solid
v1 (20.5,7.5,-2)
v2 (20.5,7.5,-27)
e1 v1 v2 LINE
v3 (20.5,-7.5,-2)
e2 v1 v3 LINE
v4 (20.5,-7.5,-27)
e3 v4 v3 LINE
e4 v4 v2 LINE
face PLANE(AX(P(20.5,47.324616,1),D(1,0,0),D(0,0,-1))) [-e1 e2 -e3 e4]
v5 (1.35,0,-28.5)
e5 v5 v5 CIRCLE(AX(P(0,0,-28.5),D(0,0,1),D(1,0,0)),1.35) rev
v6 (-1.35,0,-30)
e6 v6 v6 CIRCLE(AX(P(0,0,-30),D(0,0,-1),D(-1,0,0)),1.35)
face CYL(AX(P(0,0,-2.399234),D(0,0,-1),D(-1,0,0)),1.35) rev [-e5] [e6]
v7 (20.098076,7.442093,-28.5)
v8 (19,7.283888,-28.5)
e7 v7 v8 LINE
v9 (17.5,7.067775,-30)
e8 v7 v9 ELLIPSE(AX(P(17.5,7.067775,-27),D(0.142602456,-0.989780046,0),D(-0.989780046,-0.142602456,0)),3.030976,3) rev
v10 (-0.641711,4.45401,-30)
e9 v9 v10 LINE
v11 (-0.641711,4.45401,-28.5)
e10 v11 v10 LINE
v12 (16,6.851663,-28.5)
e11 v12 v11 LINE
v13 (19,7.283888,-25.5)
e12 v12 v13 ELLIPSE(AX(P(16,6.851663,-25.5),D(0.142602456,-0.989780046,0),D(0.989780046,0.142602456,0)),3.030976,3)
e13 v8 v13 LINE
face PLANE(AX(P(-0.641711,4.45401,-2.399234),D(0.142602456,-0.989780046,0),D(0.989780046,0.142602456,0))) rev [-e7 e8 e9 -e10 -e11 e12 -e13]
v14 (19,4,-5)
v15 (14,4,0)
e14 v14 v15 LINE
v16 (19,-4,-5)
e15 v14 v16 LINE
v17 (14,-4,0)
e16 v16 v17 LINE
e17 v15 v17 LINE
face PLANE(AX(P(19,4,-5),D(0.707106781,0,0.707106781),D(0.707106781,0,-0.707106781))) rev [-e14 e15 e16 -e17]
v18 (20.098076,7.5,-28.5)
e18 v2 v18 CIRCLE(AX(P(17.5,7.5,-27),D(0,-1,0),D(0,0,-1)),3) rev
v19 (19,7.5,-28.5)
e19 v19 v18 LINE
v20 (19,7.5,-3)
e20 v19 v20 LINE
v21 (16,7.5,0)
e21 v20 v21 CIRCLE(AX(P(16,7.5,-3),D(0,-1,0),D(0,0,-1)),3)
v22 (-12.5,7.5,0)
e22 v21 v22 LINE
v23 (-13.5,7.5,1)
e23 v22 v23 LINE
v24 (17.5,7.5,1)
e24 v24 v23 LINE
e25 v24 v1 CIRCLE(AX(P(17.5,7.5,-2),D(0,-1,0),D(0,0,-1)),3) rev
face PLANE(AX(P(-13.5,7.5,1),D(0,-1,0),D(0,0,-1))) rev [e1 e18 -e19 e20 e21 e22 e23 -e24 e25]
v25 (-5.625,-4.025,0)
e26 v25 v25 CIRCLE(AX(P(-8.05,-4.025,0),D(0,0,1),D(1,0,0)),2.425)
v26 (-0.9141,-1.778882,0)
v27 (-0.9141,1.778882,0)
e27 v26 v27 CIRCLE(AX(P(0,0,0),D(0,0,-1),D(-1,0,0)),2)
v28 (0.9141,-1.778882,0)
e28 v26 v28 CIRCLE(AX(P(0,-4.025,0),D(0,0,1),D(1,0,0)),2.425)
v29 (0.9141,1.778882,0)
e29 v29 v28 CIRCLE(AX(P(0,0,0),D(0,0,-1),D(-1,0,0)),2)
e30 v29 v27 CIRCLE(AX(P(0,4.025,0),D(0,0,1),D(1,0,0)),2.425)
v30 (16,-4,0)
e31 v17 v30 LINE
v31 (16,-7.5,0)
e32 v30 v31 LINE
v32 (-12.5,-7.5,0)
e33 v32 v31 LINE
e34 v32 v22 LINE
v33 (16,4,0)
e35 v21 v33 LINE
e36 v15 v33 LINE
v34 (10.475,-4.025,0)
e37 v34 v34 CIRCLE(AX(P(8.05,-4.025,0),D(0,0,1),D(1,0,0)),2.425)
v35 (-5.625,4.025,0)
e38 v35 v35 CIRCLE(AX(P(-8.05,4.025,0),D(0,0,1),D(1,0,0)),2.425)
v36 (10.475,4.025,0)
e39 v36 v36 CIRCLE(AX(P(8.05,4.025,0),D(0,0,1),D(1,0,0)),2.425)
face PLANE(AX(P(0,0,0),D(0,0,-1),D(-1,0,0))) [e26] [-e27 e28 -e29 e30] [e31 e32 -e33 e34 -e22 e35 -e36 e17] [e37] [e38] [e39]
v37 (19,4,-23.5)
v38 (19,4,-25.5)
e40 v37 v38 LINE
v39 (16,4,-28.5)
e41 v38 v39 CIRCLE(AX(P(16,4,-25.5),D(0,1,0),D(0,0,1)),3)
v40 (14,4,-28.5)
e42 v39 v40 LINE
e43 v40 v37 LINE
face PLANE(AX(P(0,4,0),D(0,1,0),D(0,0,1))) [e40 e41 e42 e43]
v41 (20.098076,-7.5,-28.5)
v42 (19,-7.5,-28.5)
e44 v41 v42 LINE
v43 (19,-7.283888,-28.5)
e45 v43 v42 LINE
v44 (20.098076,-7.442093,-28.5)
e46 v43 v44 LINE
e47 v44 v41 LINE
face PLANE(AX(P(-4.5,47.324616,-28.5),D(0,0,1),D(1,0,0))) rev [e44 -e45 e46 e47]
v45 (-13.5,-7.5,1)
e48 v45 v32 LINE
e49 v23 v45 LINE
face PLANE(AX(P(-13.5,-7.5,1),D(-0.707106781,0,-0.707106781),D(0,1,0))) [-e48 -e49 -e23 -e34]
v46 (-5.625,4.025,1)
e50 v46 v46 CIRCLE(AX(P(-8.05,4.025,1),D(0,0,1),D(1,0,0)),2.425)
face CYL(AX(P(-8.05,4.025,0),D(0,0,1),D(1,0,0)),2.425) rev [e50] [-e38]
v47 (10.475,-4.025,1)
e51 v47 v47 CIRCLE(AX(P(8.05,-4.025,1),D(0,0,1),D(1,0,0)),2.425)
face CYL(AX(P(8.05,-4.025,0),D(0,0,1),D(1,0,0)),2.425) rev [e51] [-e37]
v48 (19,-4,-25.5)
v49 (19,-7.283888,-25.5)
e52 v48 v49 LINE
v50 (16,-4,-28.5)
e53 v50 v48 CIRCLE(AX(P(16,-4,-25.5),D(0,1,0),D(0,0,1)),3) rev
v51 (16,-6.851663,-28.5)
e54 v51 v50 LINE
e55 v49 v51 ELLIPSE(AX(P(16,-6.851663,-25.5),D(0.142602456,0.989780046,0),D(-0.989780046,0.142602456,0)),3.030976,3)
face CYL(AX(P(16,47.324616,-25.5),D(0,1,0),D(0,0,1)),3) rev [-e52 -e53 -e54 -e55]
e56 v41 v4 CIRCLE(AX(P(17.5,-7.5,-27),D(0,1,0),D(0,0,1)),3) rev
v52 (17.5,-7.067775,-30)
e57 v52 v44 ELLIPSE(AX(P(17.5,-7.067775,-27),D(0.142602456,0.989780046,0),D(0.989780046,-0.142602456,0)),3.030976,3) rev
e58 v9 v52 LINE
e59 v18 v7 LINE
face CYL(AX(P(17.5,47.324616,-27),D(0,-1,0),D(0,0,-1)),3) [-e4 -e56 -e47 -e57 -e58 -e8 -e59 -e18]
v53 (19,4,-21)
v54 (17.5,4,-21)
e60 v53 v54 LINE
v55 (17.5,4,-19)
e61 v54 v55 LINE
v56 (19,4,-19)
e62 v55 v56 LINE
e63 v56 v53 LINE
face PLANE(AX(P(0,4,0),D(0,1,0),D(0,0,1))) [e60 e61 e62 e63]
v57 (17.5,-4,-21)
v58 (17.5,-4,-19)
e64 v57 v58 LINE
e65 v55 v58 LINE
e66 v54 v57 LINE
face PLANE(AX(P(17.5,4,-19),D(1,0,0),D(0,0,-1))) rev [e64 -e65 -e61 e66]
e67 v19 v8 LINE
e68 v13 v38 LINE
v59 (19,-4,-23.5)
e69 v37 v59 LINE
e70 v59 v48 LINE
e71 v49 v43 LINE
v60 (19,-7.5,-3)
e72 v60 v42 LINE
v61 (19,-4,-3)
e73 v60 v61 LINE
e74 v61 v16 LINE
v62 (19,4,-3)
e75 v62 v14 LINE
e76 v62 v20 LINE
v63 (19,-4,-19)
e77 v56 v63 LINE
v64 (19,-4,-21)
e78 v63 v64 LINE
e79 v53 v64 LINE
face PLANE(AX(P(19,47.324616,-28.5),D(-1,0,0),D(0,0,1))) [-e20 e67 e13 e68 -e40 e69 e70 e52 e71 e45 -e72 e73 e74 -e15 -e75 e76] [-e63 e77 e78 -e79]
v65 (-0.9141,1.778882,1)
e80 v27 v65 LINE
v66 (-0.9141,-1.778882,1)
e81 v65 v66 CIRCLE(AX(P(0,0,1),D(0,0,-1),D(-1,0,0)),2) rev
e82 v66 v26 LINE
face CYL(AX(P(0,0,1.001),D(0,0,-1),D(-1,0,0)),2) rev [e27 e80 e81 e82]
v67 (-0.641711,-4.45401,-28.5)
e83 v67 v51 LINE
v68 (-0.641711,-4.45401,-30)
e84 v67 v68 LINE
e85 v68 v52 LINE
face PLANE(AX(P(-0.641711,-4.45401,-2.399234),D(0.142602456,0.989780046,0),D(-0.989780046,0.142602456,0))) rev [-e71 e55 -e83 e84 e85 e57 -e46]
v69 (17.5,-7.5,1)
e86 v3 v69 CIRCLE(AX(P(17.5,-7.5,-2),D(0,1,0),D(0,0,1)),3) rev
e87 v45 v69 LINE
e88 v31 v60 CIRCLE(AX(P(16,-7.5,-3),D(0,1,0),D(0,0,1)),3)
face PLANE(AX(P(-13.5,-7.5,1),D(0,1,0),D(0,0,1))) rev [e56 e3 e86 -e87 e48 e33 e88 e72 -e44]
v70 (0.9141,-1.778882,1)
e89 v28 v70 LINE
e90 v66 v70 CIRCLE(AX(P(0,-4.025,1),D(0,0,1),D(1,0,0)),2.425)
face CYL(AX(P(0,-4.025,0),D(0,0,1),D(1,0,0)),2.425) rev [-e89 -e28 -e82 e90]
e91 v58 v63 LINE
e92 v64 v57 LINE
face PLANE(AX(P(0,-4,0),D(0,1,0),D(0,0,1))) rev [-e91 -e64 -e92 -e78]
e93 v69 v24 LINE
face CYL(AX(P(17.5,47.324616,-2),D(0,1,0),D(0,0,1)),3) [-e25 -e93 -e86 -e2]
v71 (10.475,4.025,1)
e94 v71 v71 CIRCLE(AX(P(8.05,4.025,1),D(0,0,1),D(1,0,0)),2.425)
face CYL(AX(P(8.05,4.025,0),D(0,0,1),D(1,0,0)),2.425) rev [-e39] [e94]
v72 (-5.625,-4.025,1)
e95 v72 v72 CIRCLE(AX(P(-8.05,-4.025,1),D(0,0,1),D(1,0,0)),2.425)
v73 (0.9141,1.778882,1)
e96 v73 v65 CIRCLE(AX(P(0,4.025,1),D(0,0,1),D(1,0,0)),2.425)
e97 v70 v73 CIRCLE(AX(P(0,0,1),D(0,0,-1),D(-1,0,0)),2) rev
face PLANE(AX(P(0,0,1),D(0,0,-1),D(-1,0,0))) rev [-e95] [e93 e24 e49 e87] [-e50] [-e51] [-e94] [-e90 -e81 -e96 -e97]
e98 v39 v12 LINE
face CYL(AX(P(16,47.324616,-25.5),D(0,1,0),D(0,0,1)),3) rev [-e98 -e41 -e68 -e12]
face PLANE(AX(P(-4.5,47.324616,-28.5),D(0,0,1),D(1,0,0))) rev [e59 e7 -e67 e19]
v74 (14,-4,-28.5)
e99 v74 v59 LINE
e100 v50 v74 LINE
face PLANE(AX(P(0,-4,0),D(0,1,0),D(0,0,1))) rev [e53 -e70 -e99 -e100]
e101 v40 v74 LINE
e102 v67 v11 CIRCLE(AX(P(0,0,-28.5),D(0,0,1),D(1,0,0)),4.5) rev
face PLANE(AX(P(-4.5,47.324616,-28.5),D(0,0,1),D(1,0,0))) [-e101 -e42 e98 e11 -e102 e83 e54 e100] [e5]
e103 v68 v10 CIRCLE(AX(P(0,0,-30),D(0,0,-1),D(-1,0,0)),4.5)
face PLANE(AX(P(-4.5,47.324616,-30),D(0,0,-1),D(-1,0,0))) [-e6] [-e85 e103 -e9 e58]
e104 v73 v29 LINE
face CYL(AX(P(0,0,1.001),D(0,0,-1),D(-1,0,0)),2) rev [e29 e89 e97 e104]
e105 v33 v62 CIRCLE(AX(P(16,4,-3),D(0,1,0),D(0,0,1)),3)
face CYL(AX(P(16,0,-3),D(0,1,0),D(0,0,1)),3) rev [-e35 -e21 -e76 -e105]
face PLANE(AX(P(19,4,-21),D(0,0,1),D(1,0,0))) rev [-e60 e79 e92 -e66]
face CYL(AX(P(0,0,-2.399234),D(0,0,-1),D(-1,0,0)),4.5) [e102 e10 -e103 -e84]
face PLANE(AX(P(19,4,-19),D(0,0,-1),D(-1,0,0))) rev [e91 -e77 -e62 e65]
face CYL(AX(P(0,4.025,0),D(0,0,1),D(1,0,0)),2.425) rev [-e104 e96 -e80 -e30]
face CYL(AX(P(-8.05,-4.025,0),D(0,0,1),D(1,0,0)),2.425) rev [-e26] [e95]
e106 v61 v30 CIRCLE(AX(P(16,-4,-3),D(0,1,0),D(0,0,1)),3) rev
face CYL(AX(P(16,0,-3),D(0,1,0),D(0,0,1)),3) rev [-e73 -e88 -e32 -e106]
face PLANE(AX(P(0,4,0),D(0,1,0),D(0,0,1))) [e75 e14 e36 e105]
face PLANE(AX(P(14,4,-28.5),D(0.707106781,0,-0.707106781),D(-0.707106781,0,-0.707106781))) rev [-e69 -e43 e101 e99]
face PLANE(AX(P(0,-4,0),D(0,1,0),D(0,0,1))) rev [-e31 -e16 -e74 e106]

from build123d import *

# Parameters (mm, degrees)
SKETCH_1_W          = 27
SKETCH_1_H          = 15
EXTRUDE_1_DEPTH     = 1
SKETCH_2_R          = 2.425
CUT_EXTRUDE_1_DEPTH = 16.475787541
EXTRUDE_2_DEPTH     = 15
SKETCH_6_W          = 1.5
SKETCH_6_H          = 2
EXTRUDE_3_DEPTH     = 4
SKETCH_7_R          = 1.35
CUT_EXTRUDE_3_DEPTH = 1.5
FILLET_1_R          = 3
CHAMFER_1_SIZE      = 1
CUT_EXTRUDE_4_REACH = 39.101
SKETCH_8_R          = 2


# Some blends are built 0.0001 mm under size
with BuildPart() as part:
    # 草图1 → 凸台-拉伸1 (new body)
    with BuildSketch(Plane.XY):
        Rectangle(SKETCH_1_W, SKETCH_1_H)
    extrude(amount=EXTRUDE_1_DEPTH)

    # 草图2 → 切除-拉伸1 (cut, through all)
    with BuildSketch(Plane.XY.offset(1)):
        with Locations((0, 4.025)):
            Circle(SKETCH_2_R)
        with Locations((0, -4.025)):
            Circle(SKETCH_2_R)
        with Locations((8.05, 4.025)):
            Circle(SKETCH_2_R)
        with Locations((8.05, -4.025)):
            Circle(SKETCH_2_R)
        with Locations((-8.05, 4.025)):
            Circle(SKETCH_2_R)
        with Locations((-8.05, -4.025)):
            Circle(SKETCH_2_R)
    extrude(amount=-CUT_EXTRUDE_1_DEPTH, mode=Mode.SUBTRACT)

    # 草图3 → 凸台-拉伸2 (add)
    with BuildSketch(Plane.XZ.offset(7.5)):
        Polygon((13.5, 0), (19, 0), (19, -28.5), (-4.5, -28.5), (-4.5, -30), (20.5, -30), (20.5, 1), (13.5, 1), align=None)
    extrude(amount=-EXTRUDE_2_DEPTH)

    # 草图6 → 凸台-拉伸3 (add, symmetric)
    with BuildSketch(Plane(origin=(0, 0, 0), x_dir=(1, 0, 0), z_dir=(0, 1, 0))):
        Polygon((19, 0), (19, 5), (14, 0), align=None)
        Polygon((19, 28.5), (14, 28.5), (19, 23.5), align=None)
        with Locations((18.25, 20)):
            Rectangle(SKETCH_6_W, SKETCH_6_H)
    extrude(amount=EXTRUDE_3_DEPTH, both=True)

    # 草图7 → 切除-拉伸3 (cut)
    with BuildSketch(Plane(origin=(0, 0, -30), x_dir=(-1, 0, 0), z_dir=(0, 0, -1))):
        with BuildLine():
            ThreePointArc((4.5, 0), (3.401301202, -2.946379157), (0.641711051, -4.454010207))
            Line((0.641711051, -4.454010207), (-20.5, -7.5))
            Line((-20.5, -7.5), (4.5, -7.5))
            Line((4.5, -7.5), (4.5, 0))
        make_face()
        with BuildLine():
            Line((-20.5, 7.5), (0.641711051, 4.454010207))
            ThreePointArc((0.641711051, 4.454010207), (3.401301202, 2.946379157), (4.5, 0))
            Line((4.5, 0), (4.5, 7.5))
            Line((4.5, 7.5), (-20.5, 7.5))
        make_face()
        Circle(SKETCH_7_R)
    extrude(amount=-CUT_EXTRUDE_3_DEPTH, mode=Mode.SUBTRACT)

    # 圆角1
    # the kernel refuses this fillet: 3 mm, written as the material it adds along each edge
    with BuildSketch(Plane(origin=(19, -3.5, -28.5), x_dir=(-1, 0, 0), z_dir=(0, 1, 0))) as fillet_1_piece_1_section:
        with BuildLine():
            CenterArc((FILLET_1_R, FILLET_1_R), FILLET_1_R, 180, 90)
            Line((0, FILLET_1_R), (0, 0))
            Line((0, 0), (FILLET_1_R, 0))
        make_face()
    fillet_1_piece_1 = extrude(amount=18.283887658, mode=Mode.PRIVATE)
    fillet_1_piece_1 = split(fillet_1_piece_1, bisect_by=Plane(origin=(18.119115161, 7.156974268, -27.821481802), z_dir=(0.1426024558755584, -0.9897800460598605, 0)), keep=Keep.TOP, mode=Mode.PRIVATE)
    add(fillet_1_piece_1)
    with BuildSketch(Plane(origin=(19, -3.5, 0), x_dir=(0, 0, -1), z_dir=(0, 1, 0)), Plane(origin=(19, -7.5, 0), x_dir=(0, 0, -1), z_dir=(0, 1, 0))) as fillet_1_piece_2:
        with BuildLine():
            CenterArc((FILLET_1_R, FILLET_1_R), FILLET_1_R, 180, 90)
            Line((0, FILLET_1_R), (0, 0))
            Line((0, 0), (FILLET_1_R, 0))
        make_face()
    extrude(amount=11)
    with BuildSketch(Plane(origin=(19, -14.783887658, -28.5), x_dir=(-1, 0, 0), z_dir=(0, 1, 0))) as fillet_1_piece_3_section:
        with BuildLine():
            CenterArc((FILLET_1_R, FILLET_1_R), FILLET_1_R, 180, 90)
            Line((0, FILLET_1_R), (0, 0))
            Line((0, 0), (FILLET_1_R, 0))
        make_face()
    fillet_1_piece_3 = extrude(amount=18.283887658, mode=Mode.PRIVATE)
    fillet_1_piece_3 = split(fillet_1_piece_3, bisect_by=Plane(origin=(18.119115161, -7.156974268, -27.821481802), z_dir=(0.1426024558755584, 0.9897800460598605, 0)), keep=Keep.TOP, mode=Mode.PRIVATE)
    add(fillet_1_piece_3)
    # the kernel refuses this fillet: 3 mm, written as the material it takes off along each edge
    with BuildSketch(Plane(origin=(20.5, -15, 1), x_dir=(0, 0, -1), z_dir=(0, 1, 0))) as fillet_1_2_piece_1:
        with BuildLine():
            CenterArc((FILLET_1_R, FILLET_1_R), FILLET_1_R, 180, 90)
            Line((0, FILLET_1_R), (0, 0))
            Line((0, 0), (FILLET_1_R, 0))
        make_face()
    extrude(amount=30, mode=Mode.SUBTRACT)
    with BuildSketch(Plane(origin=(20.5, -15, -30), x_dir=(0, 0, 1), z_dir=(0, 1, 0))) as fillet_1_2_piece_2:
        with BuildLine():
            CenterArc((FILLET_1_R, -FILLET_1_R), FILLET_1_R, 90, 90)
            Line((0, -FILLET_1_R), (0, 0))
            Line((0, 0), (FILLET_1_R, 0))
        make_face()
    extrude(amount=30, mode=Mode.SUBTRACT)

    # 倒角1
    chamfer_1_edges = [part.edges().sort_by_distance(p)[0] for p in [
        (-13.5, 0, 0),
    ]]
    chamfer(chamfer_1_edges, length=CHAMFER_1_SIZE - 0.0001)  # a hair under: the kernel refuses the full size

    # 草图8 → 切除-拉伸4 (cut, up to next)
    with BuildSketch(Plane(origin=(0, 0, 0), x_dir=(-1, 0, 0), z_dir=(0, 0, -1)), mode=Mode.PRIVATE) as cut_extrude_4_sk1:
        Circle(SKETCH_8_R)
    cut_extrude_4_tool1 = extrude(cut_extrude_4_sk1.sketch, amount=-CUT_EXTRUDE_4_REACH, mode=Mode.PRIVATE) & part.part
    add(cut_extrude_4_tool1.solids().sort_by_distance((0, 0, 0))[0], mode=Mode.SUBTRACT)


solid = part.part
